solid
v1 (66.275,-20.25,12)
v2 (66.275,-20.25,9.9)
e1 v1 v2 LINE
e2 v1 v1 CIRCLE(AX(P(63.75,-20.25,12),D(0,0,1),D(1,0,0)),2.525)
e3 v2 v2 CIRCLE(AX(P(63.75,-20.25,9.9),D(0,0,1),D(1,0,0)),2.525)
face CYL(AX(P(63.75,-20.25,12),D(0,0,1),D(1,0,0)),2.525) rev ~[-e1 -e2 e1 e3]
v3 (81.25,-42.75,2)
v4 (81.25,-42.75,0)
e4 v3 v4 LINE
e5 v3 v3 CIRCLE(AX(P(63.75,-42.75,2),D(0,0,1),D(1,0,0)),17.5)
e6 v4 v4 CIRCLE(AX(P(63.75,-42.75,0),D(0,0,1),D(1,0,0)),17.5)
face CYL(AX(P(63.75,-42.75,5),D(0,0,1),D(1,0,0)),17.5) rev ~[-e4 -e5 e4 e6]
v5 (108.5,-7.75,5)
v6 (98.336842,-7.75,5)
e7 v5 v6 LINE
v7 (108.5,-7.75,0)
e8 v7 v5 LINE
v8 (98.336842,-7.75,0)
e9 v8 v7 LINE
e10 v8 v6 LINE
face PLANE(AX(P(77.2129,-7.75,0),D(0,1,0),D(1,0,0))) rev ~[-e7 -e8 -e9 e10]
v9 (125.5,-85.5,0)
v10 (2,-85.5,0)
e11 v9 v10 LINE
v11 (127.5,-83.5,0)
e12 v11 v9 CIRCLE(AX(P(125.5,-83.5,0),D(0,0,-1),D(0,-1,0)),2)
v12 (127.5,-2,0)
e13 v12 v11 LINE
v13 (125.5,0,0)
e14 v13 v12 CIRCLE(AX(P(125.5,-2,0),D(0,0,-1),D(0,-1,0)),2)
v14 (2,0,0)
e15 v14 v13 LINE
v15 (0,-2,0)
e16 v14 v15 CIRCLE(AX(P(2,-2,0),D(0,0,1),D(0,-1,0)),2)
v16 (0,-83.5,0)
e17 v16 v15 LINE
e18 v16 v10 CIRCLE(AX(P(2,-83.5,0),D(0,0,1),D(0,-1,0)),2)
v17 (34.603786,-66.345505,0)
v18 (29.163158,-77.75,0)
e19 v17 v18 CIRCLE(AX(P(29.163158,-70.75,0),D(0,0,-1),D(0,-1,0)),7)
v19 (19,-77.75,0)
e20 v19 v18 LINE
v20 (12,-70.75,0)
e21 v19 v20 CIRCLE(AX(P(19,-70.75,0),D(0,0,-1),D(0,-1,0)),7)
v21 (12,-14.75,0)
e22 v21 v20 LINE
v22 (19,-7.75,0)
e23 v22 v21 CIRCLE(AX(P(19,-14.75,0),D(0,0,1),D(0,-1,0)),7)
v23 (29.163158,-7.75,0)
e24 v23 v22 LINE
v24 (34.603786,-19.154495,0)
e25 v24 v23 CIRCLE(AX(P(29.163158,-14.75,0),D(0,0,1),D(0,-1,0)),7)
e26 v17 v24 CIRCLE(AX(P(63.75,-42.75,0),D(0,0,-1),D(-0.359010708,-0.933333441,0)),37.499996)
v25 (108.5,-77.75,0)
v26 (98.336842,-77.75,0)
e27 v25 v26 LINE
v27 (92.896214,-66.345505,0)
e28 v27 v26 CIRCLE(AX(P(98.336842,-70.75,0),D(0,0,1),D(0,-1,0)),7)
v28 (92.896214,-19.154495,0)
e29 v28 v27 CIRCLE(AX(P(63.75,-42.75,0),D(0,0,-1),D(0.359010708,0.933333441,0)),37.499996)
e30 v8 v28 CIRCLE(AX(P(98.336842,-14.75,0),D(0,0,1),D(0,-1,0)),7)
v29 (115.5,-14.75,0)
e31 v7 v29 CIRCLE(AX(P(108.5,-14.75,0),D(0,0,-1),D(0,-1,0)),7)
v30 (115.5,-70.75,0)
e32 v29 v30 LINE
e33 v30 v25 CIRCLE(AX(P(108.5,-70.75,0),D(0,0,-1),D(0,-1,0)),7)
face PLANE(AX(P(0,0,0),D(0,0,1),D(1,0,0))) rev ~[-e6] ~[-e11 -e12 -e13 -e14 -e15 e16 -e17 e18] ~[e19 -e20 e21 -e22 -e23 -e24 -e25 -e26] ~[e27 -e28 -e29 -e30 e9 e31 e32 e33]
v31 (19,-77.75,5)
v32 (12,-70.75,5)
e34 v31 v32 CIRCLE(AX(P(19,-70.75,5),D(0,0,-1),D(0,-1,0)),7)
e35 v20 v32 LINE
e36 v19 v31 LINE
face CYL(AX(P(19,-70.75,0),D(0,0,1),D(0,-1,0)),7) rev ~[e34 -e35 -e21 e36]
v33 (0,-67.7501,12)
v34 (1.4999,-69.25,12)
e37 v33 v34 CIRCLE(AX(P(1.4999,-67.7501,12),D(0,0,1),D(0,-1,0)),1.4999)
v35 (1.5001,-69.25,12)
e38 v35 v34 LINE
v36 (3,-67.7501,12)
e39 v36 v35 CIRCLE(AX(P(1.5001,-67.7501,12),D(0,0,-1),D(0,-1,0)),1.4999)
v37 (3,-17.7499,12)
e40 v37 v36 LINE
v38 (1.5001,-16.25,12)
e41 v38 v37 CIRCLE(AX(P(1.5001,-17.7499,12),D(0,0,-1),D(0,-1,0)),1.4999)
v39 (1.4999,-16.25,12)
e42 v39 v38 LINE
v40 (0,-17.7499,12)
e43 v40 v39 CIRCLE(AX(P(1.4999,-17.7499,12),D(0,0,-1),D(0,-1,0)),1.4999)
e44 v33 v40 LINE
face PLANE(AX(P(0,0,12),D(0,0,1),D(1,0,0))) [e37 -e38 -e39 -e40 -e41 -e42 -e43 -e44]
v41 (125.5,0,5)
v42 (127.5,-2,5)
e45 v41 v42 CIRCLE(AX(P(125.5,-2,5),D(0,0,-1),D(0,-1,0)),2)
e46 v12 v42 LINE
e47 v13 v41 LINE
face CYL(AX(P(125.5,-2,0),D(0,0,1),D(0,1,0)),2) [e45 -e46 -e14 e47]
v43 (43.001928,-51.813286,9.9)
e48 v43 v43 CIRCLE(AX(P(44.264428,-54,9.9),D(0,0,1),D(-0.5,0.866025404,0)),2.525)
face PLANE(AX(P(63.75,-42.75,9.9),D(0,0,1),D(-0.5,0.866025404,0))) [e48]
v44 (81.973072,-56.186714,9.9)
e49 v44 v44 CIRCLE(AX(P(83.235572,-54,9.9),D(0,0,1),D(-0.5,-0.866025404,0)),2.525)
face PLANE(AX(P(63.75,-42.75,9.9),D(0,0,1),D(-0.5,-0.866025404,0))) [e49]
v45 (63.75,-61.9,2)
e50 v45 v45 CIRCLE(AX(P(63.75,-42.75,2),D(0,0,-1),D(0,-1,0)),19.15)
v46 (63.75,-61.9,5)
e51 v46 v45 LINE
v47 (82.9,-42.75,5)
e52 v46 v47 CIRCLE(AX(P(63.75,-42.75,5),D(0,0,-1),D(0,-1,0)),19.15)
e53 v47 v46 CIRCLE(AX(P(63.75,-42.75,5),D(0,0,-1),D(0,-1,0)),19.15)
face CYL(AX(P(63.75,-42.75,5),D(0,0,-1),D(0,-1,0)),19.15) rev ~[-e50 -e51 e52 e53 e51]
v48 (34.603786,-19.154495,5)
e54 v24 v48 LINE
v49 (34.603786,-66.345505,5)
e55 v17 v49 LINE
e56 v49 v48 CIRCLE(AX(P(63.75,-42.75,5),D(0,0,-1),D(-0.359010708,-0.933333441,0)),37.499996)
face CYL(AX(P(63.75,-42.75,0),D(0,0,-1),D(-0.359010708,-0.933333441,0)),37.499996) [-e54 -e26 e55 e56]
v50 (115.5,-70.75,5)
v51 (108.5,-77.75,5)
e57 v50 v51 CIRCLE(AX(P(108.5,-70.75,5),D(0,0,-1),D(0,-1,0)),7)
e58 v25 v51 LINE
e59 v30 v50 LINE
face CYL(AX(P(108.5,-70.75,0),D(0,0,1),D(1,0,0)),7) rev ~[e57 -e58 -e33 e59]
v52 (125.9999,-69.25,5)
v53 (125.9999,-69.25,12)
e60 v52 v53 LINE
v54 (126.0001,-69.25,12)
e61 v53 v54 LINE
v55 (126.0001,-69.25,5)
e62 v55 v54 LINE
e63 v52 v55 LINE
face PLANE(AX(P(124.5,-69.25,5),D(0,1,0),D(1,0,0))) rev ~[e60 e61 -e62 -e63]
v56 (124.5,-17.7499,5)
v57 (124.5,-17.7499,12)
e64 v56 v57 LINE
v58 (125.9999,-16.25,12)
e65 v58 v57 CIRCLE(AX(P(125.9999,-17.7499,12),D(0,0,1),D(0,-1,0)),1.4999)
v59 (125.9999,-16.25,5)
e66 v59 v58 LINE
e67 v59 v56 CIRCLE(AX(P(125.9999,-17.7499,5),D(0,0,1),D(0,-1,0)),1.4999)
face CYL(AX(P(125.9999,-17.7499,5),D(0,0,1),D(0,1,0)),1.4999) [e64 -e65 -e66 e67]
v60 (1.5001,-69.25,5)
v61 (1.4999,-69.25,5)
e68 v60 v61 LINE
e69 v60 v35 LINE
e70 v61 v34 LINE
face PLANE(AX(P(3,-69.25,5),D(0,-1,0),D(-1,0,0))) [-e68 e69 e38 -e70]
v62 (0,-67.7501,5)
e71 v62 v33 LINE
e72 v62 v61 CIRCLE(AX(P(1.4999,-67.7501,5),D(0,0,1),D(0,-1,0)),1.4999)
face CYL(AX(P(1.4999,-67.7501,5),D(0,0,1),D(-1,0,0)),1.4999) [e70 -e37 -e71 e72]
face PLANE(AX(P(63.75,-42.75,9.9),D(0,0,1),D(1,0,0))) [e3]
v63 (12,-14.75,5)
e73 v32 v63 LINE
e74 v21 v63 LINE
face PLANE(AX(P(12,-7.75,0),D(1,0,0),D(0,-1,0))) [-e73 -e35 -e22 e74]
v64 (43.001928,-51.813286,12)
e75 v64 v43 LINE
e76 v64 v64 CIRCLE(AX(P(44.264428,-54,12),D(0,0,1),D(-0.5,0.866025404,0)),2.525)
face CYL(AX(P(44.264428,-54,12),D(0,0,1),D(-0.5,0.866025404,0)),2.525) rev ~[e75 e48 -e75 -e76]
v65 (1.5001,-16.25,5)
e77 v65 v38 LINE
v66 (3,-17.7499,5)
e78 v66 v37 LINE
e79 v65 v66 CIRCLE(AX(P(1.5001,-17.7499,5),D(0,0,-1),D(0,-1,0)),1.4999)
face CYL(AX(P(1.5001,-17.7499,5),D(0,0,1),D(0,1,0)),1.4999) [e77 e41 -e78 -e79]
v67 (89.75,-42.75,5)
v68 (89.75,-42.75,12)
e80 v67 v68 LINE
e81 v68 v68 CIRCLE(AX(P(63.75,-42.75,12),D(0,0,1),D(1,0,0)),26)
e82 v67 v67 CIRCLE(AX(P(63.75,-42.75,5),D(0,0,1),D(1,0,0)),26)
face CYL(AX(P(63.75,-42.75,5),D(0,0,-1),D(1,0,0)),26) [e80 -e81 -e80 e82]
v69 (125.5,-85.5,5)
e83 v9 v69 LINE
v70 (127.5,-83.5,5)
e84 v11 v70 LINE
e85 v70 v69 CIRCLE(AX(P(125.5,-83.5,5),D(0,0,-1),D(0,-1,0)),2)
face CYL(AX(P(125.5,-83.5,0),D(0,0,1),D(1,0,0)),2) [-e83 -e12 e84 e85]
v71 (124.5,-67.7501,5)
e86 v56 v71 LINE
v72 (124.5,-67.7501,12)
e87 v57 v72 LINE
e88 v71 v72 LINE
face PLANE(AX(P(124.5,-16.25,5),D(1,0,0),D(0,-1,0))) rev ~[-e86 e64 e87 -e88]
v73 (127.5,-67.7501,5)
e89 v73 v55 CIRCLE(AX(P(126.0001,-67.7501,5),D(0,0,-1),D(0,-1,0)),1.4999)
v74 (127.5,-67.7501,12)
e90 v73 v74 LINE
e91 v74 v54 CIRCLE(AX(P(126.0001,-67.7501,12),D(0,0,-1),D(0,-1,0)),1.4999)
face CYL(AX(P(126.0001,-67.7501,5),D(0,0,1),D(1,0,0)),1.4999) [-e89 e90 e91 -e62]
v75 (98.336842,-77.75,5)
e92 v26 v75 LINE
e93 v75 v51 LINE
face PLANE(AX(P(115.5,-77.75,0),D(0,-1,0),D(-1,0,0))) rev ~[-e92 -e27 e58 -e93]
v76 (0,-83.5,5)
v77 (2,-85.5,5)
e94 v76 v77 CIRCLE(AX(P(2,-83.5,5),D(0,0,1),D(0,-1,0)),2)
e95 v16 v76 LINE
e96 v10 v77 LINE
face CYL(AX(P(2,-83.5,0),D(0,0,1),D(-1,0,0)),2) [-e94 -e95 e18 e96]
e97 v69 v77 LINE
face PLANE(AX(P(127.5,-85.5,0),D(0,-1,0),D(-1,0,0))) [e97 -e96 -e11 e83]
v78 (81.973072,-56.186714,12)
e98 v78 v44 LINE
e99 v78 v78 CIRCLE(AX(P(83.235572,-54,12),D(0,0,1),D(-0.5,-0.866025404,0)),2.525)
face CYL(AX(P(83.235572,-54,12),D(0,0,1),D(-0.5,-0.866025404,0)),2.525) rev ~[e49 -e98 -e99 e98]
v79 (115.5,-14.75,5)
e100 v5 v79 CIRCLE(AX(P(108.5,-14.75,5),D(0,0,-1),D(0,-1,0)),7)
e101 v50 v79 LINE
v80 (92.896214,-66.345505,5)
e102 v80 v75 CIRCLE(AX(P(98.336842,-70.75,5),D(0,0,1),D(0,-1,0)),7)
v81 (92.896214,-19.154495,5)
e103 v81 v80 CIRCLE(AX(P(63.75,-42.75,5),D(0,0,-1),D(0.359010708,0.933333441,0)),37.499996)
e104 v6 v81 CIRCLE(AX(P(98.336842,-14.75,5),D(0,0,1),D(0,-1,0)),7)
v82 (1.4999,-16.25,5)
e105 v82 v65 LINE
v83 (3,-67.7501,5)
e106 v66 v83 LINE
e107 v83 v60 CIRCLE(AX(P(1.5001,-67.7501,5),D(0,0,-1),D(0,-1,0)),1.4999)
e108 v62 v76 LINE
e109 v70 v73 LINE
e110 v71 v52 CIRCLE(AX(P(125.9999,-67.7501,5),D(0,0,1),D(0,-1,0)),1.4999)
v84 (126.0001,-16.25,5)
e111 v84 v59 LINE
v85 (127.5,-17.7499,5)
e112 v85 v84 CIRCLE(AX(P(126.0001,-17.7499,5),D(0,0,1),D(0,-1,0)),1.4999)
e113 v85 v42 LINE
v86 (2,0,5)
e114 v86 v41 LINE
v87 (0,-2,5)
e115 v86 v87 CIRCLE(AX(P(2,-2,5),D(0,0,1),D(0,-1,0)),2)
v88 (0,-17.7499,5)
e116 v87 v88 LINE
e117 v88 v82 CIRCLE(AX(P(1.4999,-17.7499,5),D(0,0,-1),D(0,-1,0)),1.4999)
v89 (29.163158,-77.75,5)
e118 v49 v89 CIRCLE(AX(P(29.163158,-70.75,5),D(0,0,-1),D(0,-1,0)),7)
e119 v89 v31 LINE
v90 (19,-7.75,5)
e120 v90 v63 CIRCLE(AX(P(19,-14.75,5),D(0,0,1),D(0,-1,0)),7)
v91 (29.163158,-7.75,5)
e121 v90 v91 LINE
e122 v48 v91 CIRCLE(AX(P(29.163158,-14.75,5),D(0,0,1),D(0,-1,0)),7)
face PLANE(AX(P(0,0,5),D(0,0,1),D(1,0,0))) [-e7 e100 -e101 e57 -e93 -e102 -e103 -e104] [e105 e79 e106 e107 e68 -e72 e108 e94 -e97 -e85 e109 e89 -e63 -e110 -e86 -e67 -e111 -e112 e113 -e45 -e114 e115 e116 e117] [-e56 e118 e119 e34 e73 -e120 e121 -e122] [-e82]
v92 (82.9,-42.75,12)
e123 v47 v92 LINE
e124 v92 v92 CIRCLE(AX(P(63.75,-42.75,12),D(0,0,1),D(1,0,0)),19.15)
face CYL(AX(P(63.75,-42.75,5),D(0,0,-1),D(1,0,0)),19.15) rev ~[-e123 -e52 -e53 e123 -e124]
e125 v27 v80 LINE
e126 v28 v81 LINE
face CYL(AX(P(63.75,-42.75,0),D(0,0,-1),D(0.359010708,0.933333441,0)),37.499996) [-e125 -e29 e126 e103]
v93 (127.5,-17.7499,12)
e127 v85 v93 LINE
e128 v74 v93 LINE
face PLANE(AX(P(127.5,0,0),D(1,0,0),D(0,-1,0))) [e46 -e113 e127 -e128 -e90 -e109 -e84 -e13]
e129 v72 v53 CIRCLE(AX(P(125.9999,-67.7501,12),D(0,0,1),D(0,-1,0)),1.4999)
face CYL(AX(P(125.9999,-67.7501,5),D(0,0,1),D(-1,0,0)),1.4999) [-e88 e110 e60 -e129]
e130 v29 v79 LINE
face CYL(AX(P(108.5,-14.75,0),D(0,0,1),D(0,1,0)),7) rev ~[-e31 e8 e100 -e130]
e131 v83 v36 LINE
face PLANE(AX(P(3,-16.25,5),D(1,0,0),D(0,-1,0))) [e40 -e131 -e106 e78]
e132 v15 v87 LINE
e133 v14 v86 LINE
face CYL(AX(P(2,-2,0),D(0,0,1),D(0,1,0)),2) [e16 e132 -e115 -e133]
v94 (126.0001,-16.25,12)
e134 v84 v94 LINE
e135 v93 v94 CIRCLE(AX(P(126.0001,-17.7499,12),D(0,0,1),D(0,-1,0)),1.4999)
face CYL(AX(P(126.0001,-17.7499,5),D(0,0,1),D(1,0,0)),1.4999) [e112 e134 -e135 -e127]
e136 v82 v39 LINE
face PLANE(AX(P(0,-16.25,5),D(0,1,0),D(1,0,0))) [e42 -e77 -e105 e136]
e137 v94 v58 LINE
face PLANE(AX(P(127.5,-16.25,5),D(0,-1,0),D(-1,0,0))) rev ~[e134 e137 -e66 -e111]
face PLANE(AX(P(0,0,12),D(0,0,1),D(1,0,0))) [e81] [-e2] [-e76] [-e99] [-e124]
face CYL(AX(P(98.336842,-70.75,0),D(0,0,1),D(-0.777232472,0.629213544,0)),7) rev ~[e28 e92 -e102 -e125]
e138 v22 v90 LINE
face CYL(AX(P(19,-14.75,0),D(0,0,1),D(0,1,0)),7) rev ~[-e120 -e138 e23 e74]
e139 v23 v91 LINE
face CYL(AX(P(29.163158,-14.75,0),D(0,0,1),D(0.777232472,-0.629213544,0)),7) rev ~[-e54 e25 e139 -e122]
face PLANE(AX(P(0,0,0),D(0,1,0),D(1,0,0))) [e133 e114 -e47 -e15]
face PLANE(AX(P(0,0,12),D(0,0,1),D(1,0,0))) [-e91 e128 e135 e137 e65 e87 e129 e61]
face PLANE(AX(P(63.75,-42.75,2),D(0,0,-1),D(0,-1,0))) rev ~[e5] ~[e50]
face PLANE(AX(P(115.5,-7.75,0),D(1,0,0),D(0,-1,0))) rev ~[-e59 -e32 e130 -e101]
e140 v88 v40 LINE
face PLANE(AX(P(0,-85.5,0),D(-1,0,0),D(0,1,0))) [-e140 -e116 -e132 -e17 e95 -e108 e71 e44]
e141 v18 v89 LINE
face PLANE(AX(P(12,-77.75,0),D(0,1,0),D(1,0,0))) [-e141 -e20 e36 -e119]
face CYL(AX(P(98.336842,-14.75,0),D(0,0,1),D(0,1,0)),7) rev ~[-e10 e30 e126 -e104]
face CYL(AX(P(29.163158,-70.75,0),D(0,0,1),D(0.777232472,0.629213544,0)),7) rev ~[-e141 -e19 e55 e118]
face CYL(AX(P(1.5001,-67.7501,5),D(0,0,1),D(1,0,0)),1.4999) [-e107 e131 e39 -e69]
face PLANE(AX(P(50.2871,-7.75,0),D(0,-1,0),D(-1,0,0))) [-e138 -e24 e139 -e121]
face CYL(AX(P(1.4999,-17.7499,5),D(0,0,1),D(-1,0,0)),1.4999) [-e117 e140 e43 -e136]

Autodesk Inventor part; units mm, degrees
ref_plane "YZ Plane" through (0, 0, 0) normal (1, 0, 0) x (0, 1, 0)
ref_plane "XZ Plane" through (0, 0, 0) normal (0, 1, 0) x (-1, 0, 0)
ref_plane "XY Plane" through (0, 0, 0) normal (0, 0, 1) x (1, 0, 0)
sketch "Skizze1" plane through (0, 0, 0) normal (0, 0, 1) x (1, 0, 0)
  line L0 (0, 0) -> (127.5, 0)
  line L1 (127.5, 0) -> (127.5, -85.5)
  line L2 (127.5, -85.5) -> (0, -85.5)
  line L3 (0, -85.5) -> (0, 0)
  dimension "d0" = 127.5
  dimension "d1" = 85.5
extrude "Extrusion1" add sketch "Skizze1" along normal blind 5
sketch "Skizze2" plane through (0, 0, 5) normal (0, 0, 1) x (1, 0, 0)
  line L0 (0, -16.25) -> (3, -16.25)
  line L1 (3, -16.25) -> (3, -69.25)
  line L2 (3, -69.25) -> (0, -69.25)
  line L3 (0, -69.25) -> (0, -16.25)
  line L4 (63.75, 42.9175) -> (63.75, -147.2432)
  line L5 (127.5, -85.5) -> (127.5, 0) projected
  line L6 (127.5, -16.25) -> (124.5, -16.25)
  line L7 (124.5, -16.25) -> (124.5, -69.25)
  line L8 (124.5, -69.25) -> (127.5, -69.25)
  line L9 (127.5, -69.25) -> (127.5, -16.25)
  point P0 (0, 0)
  dimension "d4" = 3
  dimension "d5" = 53
  dimension "d6" = 16.25
  dimension "d7" = 63.75
extrude "Extrusion2" add sketch "Skizze2" along normal blind 7
fillet "Rundung1" radius 2 4 edges at (0, 0, 2.5) (127.5, 0, 2.5) (127.5, -85.5, 2.5) (0, -85.5, 2.5)
fillet "Rundung2" radius 1.5 8 edges at (3, -69.25, 8.5) (0, -69.25, 8.5) (3, -16.25, 8.5) (0, -16.25, 8.5) (124.5, -16.25, 8.5) (127.5, -16.25, 8.5) (124.5, -69.25, 8.5) (127.5, -69.25, 8.5)
sketch "Skizze3" plane through (0, 0, 5) normal (0, 0, 1) x (1, 0, 0)
  circle A0 centre (63.75, -42.75) radius 17.5
  line L0 (0, -67.75) -> (0, -83.5) projected
  point P0 (0, 0)
  dimension "d12" = 35
  dimension "d13" = 63.75
  dimension "d14" = 42.75
extrude "Extrusion3" cut sketch "Skizze3" against normal blind 10
hole "Bohrung1" at (63.75, -42.75, 5) direction (0, 0, -1) diameter 38.3 depth 3
sketch "Skizze4" plane through (0, 0, 0) normal (0, 0, -1) x (-1, 0, 0)
  line L0 (-125.5, -85.5) -> (-2, -85.5) projected
  line L1 (0, -83.5) -> (0, -2) projected
  line L2 (-12, -77.75) -> (-50.2871, -77.75)
  line L3 (-50.2871, -7.75) -> (-12, -7.75)
  line L4 (-12, -7.75) -> (-12, -77.75)
  line L5 (-63.75, -42.75) -> (-63.75, -99.3052)
  line L6 (-115.5, -77.75) -> (-77.2129, -77.75)
  line L7 (-77.2129, -7.75) -> (-115.5, -7.75)
  line L8 (-115.5, -7.75) -> (-115.5, -77.75)
  arc A0 (-50.2871, -77.75) -> (-50.2871, -7.75) centre (-63.75, -42.75) ccw
  arc A1 (-77.2129, -7.75) -> (-77.2129, -77.75) centre (-63.75, -42.75) ccw
  arc A2 (-50.2871, -77.75) -> (-50.2871, -7.75) centre (-63.75, -42.75) ccw
  arc A3 (-77.2129, -7.75) -> (-77.2129, -77.75) centre (-63.75, -42.75) ccw
  point P0 (0, 0)
  dimension "d27" = 42.75
  dimension "d28" = 63.75
  dimension "d29" = 12
  dimension "d30" = 70
  dimension "d31" = 7.75
extrude "Extrusion4" cut sketch "Skizze4" against normal blind 10
fillet "Rundung3" radius 7 4 edges at (50.2871, -77.75, 2.5) (77.2129, -77.75, 2.5) (50.2871, -7.75, 2.5) (77.2129, -7.75, 2.5)
fillet "Rundung4" radius 7 4 edges at (12, -77.75, 2.5) (115.5, -77.75, 2.5) (12, -7.75, 2.5) (115.5, -7.75, 2.5)
sketch "Skizze5" plane through (0, 0, 5) normal (0, 0, 1) x (1, 0, 0)
  circle A0 centre (63.75, -42.75) radius 19.15
  circle A1 centre (63.75, -42.75) radius 26
  line L0 (125.5, 0) -> (2, 0) projected
  point P0 (0, 0)
  dimension "d36" = 38.3
  dimension "d37" = 52
  dimension "d38" = 42.75
  dimension "d39" = 63.75
extrude "Extrusion5" add sketch "Skizze5" along normal blind 7
sketch "Skizze6" plane through (63.75, -42.75, 12) normal (0, 0, 1) x (1, 0, 0)
  circle A0 centre (0, 22.5) radius 2.525
  circle A1 centre (0, 0) radius 17.5 projected
  point P0 (-63.75, 42.75)
  dimension "d44" = 5.05
  dimension "d45" = 22.5
extrude "Extrusion6" cut sketch "Skizze6" against normal blind 2.1 contours A0
pattern_circular "Runde Anordnung1" count 3 over 360 about axis through (63.75, -42.75, 5) along (0, 0, 1) of "Extrusion6"
properties part number "Sensor Halterung381"
